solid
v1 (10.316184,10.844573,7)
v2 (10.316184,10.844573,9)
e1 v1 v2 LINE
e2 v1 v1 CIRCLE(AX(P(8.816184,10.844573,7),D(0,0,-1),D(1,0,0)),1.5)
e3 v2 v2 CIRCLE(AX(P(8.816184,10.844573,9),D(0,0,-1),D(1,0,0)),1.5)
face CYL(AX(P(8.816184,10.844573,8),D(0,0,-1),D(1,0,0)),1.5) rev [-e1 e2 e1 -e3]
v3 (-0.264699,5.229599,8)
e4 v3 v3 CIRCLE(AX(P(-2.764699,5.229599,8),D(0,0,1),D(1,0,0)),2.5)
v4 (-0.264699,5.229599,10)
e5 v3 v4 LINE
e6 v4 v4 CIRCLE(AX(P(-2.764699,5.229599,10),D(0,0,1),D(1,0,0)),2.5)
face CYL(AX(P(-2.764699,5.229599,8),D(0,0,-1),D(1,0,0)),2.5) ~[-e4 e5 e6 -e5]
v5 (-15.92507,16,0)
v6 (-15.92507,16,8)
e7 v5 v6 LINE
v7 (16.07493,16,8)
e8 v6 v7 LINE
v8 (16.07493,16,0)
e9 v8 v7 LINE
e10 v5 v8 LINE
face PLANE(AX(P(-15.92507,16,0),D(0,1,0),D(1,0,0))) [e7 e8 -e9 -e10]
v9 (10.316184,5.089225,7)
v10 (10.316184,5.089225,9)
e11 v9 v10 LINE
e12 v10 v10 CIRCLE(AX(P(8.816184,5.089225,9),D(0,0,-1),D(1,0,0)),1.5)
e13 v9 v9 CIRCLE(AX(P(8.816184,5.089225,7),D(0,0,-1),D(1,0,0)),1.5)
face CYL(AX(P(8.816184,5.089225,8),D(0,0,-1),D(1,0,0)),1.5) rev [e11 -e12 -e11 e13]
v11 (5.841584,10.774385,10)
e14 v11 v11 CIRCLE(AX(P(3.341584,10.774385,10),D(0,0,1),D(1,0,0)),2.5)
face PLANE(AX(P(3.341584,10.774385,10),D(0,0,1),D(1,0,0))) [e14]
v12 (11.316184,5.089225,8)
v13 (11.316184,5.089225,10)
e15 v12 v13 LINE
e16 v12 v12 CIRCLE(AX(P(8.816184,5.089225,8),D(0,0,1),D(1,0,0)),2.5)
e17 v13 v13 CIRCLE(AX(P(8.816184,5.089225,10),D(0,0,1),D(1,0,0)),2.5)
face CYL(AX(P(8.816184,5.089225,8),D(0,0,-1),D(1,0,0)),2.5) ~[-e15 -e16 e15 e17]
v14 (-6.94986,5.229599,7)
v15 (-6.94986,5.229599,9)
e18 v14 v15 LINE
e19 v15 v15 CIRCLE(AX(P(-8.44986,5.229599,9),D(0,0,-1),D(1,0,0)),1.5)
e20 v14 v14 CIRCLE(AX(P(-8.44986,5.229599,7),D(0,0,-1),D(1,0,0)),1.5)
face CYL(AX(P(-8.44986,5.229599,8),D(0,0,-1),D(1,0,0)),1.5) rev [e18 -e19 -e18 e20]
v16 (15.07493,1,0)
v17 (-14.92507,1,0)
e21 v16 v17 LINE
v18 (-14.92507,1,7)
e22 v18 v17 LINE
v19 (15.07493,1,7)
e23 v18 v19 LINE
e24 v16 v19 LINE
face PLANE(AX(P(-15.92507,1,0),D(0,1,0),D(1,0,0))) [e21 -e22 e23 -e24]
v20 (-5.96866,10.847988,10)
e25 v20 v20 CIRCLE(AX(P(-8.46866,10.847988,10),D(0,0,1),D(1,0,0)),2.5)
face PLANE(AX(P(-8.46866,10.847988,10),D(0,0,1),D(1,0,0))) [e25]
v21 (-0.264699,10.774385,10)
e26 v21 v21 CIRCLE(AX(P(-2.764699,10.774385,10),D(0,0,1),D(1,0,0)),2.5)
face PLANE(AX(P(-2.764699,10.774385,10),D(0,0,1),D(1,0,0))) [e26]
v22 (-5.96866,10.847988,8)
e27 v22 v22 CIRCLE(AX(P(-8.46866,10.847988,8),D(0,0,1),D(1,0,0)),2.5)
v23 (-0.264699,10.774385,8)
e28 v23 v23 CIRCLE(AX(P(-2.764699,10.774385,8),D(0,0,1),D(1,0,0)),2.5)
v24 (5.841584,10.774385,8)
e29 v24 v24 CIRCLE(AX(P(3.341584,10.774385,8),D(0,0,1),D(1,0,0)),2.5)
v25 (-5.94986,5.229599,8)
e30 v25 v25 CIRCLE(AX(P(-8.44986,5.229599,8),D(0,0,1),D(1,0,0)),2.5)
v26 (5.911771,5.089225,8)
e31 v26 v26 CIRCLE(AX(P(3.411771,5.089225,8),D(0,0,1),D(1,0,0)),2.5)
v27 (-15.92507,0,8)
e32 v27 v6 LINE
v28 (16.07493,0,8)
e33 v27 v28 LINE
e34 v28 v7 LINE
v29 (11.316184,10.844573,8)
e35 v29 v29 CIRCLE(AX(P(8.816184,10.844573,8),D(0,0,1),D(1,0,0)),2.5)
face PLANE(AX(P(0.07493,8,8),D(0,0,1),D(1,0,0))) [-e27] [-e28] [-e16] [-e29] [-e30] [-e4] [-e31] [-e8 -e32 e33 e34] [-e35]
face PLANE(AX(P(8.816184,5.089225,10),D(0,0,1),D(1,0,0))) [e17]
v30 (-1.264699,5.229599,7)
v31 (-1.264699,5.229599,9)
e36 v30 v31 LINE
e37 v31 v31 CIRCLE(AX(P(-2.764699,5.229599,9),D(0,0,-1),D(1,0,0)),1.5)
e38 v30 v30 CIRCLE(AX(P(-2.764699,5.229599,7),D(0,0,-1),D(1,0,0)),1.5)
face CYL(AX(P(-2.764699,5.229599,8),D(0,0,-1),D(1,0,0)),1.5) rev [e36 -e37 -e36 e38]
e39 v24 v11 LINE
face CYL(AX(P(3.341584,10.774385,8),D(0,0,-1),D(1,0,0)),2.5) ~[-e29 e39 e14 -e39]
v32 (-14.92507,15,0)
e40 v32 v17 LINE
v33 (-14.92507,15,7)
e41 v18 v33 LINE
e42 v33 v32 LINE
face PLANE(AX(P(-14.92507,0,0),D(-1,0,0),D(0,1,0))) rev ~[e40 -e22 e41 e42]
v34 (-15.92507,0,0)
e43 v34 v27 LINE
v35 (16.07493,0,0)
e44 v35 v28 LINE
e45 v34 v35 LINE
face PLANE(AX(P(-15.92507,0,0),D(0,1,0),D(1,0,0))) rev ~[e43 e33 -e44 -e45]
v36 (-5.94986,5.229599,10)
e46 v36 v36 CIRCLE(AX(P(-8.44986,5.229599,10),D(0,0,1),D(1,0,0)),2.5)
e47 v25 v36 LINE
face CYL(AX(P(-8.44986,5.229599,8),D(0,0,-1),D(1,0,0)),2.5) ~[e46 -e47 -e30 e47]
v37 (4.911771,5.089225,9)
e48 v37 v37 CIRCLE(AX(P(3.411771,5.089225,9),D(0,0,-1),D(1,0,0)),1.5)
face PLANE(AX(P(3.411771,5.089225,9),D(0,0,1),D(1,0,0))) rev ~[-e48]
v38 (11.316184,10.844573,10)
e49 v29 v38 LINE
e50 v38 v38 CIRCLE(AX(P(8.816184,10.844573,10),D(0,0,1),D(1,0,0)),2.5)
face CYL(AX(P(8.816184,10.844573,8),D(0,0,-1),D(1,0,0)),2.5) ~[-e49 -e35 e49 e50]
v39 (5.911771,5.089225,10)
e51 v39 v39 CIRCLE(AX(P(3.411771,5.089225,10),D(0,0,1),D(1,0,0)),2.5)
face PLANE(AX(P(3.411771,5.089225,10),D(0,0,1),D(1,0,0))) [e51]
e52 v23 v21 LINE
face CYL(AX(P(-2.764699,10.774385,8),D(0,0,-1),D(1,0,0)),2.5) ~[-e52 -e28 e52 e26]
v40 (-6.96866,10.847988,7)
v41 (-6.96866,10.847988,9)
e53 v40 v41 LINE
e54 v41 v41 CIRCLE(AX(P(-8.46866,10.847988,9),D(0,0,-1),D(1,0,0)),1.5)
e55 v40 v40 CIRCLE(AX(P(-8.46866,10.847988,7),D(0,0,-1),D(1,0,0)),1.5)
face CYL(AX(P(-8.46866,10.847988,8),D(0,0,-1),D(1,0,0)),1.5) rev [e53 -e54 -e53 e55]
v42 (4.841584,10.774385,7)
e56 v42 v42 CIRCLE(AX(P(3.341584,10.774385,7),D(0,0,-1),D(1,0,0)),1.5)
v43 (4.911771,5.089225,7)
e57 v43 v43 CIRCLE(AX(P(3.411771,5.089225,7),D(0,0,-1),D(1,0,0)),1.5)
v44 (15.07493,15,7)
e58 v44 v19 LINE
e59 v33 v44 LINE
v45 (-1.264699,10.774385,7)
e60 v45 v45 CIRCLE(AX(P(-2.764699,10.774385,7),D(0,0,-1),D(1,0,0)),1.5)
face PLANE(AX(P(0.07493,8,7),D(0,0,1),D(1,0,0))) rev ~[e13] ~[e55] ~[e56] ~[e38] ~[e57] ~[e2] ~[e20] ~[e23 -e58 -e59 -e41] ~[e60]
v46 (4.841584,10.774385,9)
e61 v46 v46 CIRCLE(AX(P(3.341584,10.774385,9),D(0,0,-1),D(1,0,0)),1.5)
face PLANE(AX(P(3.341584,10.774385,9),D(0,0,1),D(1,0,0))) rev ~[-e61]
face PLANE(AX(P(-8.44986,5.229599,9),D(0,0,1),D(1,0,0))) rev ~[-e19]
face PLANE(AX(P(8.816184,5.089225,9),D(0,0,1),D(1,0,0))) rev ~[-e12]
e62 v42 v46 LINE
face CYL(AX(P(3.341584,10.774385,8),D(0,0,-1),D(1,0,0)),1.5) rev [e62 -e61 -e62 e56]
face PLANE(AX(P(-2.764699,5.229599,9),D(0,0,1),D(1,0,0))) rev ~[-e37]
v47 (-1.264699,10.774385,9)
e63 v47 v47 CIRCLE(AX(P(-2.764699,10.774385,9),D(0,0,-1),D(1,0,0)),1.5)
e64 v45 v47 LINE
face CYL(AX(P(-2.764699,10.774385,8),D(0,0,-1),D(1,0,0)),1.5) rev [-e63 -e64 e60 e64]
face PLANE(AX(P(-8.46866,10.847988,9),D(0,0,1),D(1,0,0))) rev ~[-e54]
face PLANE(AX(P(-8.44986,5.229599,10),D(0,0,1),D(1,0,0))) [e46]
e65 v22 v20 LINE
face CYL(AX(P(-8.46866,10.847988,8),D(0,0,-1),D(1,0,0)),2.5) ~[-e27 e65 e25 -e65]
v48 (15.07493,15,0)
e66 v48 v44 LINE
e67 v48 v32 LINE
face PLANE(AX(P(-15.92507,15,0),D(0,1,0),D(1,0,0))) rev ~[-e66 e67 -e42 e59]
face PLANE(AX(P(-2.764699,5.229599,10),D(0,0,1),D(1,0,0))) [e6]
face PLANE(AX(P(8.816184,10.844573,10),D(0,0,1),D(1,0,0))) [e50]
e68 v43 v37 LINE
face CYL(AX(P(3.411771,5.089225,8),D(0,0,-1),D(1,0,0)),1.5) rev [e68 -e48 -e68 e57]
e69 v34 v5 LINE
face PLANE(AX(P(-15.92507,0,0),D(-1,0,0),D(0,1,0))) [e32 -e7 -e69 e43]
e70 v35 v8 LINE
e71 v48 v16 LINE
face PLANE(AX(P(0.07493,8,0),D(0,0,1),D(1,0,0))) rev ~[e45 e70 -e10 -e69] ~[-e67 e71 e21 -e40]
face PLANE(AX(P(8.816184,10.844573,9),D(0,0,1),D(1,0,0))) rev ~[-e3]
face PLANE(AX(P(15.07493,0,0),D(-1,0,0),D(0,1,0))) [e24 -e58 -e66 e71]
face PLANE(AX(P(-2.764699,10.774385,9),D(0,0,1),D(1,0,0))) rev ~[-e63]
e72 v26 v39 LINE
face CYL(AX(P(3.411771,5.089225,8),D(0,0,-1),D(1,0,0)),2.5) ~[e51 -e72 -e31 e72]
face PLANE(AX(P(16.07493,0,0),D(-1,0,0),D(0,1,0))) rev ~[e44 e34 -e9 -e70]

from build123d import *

# Parameters (mm, degrees)
F0_W     = 32
F0_H     = 16
F1_DEPTH = 8
F3_R     = 2.5
F4_DEPTH = 2
F5_T     = -1


# Not quite as in the source:
# - the program builds the solid bodies; features that only make, move or delete a surface that nothing else refers to are left out


with BuildPart() as f1:
    # F0 (on Top) → F1 (new body)
    with BuildSketch(Plane.XY):
        with Locations((0.0749295065, 8)):
            Rectangle(F0_W, F0_H)
    extrude(amount=F1_DEPTH)

    # F3 (on offset) → F4 (join)
    with BuildSketch(Plane.XY.offset(8)):
        with Locations((-8.4686602995, 10.8479883277)):
            Circle(F3_R)
        with Locations((-2.7646990493, 10.774385184)):
            Circle(F3_R)
        with Locations((3.3415844664, 10.774385184)):
            Circle(F3_R)
        with Locations((8.8161835447, 10.8445733786)):
            Circle(F3_R)
        with Locations((8.8161835447, 5.0892247818)):
            Circle(F3_R)
        with Locations((3.4117714968, 5.0892247818)):
            Circle(F3_R)
        with Locations((-2.7646990493, 5.2295993082)):
            Circle(F3_R)
        with Locations((-8.4498599172, 5.2295993082)):
            Circle(F3_R)
    extrude(amount=F4_DEPTH)

    # F5
    f5_openings = [f1.faces().sort_by_distance(p)[0] for p in [
        (0.07493, 8, 0),
    ]]
    offset(amount=F5_T, openings=f5_openings, kind=Kind.INTERSECTION)


solid = f1.part
